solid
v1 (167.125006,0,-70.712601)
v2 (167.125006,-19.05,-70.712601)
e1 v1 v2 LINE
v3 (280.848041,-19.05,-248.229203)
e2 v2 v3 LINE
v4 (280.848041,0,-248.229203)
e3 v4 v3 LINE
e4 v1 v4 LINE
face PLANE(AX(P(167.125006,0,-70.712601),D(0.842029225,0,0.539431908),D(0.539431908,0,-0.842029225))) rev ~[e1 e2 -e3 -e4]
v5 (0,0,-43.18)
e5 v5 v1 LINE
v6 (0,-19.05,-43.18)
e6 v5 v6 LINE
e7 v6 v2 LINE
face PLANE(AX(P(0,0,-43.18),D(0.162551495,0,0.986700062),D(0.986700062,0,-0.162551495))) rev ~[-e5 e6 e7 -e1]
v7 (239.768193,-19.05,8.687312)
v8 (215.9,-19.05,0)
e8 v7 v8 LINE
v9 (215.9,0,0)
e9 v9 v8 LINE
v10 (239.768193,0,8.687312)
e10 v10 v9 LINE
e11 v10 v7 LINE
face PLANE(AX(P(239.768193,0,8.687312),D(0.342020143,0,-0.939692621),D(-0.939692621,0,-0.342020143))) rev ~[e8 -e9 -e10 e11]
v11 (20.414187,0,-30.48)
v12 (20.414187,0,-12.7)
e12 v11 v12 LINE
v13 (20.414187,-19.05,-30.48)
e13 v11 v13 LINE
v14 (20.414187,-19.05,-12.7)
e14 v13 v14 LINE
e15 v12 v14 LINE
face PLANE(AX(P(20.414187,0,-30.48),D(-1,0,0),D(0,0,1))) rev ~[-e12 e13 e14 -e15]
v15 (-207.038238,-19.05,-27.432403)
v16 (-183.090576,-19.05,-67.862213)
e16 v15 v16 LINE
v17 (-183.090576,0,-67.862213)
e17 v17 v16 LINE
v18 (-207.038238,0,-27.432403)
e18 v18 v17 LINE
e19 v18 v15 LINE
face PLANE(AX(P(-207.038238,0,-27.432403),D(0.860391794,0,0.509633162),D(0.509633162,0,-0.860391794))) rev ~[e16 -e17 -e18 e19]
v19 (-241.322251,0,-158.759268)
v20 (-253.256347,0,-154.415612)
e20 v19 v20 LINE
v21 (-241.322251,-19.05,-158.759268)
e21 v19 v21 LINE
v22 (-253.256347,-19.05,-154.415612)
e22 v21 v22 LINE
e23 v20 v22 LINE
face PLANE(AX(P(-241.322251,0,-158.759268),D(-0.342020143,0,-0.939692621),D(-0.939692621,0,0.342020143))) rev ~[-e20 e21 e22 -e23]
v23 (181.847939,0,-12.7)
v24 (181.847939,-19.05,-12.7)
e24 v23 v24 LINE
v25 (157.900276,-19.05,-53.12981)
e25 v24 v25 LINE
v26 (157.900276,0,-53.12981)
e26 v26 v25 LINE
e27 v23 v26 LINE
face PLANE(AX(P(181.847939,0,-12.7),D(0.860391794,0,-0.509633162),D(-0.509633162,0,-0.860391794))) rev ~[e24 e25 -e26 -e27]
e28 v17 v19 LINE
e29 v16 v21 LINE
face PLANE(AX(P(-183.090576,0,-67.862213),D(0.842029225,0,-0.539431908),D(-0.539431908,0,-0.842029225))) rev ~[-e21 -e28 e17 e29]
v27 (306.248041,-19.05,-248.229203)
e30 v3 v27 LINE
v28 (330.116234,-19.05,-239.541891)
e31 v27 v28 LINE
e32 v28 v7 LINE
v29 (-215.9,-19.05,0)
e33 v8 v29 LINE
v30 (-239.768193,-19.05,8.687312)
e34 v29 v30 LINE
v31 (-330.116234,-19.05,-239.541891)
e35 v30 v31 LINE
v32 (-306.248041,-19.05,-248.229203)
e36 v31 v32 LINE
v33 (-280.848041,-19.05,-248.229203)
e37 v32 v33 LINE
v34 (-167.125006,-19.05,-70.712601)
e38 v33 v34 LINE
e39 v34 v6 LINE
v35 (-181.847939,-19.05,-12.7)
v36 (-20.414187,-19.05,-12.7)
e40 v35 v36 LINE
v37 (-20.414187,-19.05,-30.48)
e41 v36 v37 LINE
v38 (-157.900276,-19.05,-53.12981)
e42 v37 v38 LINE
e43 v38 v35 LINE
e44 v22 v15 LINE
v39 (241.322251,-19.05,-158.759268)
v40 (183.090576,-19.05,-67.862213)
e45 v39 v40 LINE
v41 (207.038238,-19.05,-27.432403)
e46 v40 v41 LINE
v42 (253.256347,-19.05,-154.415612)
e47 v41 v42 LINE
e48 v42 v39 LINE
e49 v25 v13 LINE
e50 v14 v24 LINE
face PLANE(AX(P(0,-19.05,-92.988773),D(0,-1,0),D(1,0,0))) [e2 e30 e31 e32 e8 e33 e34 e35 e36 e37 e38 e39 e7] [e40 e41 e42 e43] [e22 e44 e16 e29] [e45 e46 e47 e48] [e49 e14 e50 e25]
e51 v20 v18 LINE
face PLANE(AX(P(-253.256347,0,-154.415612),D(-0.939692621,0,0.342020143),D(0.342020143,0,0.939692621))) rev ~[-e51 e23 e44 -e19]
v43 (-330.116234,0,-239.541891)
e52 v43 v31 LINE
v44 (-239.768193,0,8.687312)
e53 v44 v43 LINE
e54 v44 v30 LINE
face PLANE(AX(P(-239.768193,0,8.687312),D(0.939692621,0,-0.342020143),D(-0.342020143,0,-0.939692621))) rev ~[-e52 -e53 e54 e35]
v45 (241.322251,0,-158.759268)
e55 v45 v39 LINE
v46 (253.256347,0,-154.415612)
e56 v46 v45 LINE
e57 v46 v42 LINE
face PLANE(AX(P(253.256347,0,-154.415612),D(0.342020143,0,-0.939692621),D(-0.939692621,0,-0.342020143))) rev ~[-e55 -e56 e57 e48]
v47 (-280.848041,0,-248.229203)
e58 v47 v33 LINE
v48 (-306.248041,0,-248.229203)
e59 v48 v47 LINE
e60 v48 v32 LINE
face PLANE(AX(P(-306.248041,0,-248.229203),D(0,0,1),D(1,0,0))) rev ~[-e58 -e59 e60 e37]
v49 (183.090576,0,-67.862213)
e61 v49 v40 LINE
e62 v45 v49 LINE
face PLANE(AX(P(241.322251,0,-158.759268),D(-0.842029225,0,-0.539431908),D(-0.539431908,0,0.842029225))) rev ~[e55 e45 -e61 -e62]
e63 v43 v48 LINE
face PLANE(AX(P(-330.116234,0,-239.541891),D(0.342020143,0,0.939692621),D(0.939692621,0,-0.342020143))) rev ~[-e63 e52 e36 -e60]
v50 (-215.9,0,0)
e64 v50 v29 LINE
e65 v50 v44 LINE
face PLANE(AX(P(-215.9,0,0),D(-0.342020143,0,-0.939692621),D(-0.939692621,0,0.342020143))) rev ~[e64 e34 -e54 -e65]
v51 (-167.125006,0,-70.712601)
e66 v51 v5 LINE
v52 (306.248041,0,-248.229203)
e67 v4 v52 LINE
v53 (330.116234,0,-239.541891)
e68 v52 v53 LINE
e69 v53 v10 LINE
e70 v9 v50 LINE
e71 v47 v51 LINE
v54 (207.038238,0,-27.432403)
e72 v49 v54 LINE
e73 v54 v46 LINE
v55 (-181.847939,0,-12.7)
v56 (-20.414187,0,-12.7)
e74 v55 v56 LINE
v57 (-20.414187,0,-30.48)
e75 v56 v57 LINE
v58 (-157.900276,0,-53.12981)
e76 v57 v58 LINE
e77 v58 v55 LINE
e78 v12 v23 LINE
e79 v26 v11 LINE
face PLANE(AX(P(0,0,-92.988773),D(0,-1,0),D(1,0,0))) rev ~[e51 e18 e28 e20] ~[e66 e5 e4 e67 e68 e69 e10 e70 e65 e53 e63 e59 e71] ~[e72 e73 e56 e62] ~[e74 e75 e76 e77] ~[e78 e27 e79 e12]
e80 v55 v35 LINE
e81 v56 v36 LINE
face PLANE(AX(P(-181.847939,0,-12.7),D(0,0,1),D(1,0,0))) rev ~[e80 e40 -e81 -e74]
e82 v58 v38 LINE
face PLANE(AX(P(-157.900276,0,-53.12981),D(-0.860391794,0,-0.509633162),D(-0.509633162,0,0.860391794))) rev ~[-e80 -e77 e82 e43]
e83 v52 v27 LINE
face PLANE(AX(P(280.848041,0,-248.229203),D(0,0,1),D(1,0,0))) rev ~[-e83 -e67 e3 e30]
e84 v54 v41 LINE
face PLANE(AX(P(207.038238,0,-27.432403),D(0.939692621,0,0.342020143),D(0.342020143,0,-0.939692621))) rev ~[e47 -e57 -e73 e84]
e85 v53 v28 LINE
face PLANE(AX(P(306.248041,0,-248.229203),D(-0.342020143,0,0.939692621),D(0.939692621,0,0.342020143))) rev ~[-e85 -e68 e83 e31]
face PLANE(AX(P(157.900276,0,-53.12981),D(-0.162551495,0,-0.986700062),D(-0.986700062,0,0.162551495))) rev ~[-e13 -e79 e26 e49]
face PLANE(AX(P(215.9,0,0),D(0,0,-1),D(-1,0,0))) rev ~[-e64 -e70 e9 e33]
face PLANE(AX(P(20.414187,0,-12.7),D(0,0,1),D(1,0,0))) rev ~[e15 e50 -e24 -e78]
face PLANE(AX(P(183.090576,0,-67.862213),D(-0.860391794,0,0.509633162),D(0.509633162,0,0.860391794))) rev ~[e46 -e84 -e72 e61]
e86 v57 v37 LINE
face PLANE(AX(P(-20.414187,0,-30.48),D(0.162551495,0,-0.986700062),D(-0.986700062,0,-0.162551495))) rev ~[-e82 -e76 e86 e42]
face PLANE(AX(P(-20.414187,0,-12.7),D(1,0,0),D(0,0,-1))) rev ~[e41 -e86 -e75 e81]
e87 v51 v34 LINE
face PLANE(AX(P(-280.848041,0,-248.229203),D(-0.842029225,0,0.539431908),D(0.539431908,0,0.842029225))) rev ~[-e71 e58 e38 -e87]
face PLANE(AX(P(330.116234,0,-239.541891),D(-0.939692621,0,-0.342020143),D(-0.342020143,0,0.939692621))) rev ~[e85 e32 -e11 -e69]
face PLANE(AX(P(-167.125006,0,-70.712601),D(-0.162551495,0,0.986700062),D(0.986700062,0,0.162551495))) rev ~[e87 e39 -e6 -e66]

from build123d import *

# Parameters (mm, degrees)
F2_DEPTH = 19.05


# Not quite as in the source:
# - a variable given as a bare number and used for a length is read in inches; the dataset says mm whatever the document's units were


with BuildPart() as f2:
    # F1 (on Front) → F2 (new body)
    with BuildSketch(Plane.XZ):
        Polygon((215.9, 0), (0, 0), (-215.9, 0), (-306.2480410609, -248.2292027068), (-280.8480410609, -248.2292027068), (-167.1250061285, -70.7126014387), (0, -43.18), (167.1250061285, -70.7126014387), (280.8480410609, -248.2292027068), (306.2480410609, -248.2292027068), align=None)
        Polygon((-253.2563468183, -154.4156124752), (-207.0382383225, -27.4324030132), (-183.0905760207, -67.8622134293), (-241.3222505343, -158.7592682954), align=None, mode=Mode.SUBTRACT)
        Polygon((-181.84793878, -12.7), (-20.4141870137, -12.7), (-20.4141870137, -30.48), (-157.9002764782, -53.1298104161), align=None, mode=Mode.SUBTRACT)
        Polygon((183.0905760207, -67.8622134293), (207.0382383225, -27.4324030132), (253.2563468183, -154.4156124752), (241.3222505343, -158.7592682954), align=None, mode=Mode.SUBTRACT)
        Polygon((157.9002764782, -53.1298104161), (20.4141870137, -30.48), (20.4141870137, -12.7), (181.84793878, -12.7), align=None, mode=Mode.SUBTRACT)
        Polygon((-306.2480410609, -248.2292027068), (-215.9, 0), (-239.768192568, 8.6873116405), (-330.1162336289, -239.5418910663), align=None)
        Polygon((239.768192568, 8.6873116405), (215.9, 0), (306.2480410609, -248.2292027068), (330.1162336289, -239.5418910663), align=None)
    extrude(amount=F2_DEPTH)


solid = f2.part
